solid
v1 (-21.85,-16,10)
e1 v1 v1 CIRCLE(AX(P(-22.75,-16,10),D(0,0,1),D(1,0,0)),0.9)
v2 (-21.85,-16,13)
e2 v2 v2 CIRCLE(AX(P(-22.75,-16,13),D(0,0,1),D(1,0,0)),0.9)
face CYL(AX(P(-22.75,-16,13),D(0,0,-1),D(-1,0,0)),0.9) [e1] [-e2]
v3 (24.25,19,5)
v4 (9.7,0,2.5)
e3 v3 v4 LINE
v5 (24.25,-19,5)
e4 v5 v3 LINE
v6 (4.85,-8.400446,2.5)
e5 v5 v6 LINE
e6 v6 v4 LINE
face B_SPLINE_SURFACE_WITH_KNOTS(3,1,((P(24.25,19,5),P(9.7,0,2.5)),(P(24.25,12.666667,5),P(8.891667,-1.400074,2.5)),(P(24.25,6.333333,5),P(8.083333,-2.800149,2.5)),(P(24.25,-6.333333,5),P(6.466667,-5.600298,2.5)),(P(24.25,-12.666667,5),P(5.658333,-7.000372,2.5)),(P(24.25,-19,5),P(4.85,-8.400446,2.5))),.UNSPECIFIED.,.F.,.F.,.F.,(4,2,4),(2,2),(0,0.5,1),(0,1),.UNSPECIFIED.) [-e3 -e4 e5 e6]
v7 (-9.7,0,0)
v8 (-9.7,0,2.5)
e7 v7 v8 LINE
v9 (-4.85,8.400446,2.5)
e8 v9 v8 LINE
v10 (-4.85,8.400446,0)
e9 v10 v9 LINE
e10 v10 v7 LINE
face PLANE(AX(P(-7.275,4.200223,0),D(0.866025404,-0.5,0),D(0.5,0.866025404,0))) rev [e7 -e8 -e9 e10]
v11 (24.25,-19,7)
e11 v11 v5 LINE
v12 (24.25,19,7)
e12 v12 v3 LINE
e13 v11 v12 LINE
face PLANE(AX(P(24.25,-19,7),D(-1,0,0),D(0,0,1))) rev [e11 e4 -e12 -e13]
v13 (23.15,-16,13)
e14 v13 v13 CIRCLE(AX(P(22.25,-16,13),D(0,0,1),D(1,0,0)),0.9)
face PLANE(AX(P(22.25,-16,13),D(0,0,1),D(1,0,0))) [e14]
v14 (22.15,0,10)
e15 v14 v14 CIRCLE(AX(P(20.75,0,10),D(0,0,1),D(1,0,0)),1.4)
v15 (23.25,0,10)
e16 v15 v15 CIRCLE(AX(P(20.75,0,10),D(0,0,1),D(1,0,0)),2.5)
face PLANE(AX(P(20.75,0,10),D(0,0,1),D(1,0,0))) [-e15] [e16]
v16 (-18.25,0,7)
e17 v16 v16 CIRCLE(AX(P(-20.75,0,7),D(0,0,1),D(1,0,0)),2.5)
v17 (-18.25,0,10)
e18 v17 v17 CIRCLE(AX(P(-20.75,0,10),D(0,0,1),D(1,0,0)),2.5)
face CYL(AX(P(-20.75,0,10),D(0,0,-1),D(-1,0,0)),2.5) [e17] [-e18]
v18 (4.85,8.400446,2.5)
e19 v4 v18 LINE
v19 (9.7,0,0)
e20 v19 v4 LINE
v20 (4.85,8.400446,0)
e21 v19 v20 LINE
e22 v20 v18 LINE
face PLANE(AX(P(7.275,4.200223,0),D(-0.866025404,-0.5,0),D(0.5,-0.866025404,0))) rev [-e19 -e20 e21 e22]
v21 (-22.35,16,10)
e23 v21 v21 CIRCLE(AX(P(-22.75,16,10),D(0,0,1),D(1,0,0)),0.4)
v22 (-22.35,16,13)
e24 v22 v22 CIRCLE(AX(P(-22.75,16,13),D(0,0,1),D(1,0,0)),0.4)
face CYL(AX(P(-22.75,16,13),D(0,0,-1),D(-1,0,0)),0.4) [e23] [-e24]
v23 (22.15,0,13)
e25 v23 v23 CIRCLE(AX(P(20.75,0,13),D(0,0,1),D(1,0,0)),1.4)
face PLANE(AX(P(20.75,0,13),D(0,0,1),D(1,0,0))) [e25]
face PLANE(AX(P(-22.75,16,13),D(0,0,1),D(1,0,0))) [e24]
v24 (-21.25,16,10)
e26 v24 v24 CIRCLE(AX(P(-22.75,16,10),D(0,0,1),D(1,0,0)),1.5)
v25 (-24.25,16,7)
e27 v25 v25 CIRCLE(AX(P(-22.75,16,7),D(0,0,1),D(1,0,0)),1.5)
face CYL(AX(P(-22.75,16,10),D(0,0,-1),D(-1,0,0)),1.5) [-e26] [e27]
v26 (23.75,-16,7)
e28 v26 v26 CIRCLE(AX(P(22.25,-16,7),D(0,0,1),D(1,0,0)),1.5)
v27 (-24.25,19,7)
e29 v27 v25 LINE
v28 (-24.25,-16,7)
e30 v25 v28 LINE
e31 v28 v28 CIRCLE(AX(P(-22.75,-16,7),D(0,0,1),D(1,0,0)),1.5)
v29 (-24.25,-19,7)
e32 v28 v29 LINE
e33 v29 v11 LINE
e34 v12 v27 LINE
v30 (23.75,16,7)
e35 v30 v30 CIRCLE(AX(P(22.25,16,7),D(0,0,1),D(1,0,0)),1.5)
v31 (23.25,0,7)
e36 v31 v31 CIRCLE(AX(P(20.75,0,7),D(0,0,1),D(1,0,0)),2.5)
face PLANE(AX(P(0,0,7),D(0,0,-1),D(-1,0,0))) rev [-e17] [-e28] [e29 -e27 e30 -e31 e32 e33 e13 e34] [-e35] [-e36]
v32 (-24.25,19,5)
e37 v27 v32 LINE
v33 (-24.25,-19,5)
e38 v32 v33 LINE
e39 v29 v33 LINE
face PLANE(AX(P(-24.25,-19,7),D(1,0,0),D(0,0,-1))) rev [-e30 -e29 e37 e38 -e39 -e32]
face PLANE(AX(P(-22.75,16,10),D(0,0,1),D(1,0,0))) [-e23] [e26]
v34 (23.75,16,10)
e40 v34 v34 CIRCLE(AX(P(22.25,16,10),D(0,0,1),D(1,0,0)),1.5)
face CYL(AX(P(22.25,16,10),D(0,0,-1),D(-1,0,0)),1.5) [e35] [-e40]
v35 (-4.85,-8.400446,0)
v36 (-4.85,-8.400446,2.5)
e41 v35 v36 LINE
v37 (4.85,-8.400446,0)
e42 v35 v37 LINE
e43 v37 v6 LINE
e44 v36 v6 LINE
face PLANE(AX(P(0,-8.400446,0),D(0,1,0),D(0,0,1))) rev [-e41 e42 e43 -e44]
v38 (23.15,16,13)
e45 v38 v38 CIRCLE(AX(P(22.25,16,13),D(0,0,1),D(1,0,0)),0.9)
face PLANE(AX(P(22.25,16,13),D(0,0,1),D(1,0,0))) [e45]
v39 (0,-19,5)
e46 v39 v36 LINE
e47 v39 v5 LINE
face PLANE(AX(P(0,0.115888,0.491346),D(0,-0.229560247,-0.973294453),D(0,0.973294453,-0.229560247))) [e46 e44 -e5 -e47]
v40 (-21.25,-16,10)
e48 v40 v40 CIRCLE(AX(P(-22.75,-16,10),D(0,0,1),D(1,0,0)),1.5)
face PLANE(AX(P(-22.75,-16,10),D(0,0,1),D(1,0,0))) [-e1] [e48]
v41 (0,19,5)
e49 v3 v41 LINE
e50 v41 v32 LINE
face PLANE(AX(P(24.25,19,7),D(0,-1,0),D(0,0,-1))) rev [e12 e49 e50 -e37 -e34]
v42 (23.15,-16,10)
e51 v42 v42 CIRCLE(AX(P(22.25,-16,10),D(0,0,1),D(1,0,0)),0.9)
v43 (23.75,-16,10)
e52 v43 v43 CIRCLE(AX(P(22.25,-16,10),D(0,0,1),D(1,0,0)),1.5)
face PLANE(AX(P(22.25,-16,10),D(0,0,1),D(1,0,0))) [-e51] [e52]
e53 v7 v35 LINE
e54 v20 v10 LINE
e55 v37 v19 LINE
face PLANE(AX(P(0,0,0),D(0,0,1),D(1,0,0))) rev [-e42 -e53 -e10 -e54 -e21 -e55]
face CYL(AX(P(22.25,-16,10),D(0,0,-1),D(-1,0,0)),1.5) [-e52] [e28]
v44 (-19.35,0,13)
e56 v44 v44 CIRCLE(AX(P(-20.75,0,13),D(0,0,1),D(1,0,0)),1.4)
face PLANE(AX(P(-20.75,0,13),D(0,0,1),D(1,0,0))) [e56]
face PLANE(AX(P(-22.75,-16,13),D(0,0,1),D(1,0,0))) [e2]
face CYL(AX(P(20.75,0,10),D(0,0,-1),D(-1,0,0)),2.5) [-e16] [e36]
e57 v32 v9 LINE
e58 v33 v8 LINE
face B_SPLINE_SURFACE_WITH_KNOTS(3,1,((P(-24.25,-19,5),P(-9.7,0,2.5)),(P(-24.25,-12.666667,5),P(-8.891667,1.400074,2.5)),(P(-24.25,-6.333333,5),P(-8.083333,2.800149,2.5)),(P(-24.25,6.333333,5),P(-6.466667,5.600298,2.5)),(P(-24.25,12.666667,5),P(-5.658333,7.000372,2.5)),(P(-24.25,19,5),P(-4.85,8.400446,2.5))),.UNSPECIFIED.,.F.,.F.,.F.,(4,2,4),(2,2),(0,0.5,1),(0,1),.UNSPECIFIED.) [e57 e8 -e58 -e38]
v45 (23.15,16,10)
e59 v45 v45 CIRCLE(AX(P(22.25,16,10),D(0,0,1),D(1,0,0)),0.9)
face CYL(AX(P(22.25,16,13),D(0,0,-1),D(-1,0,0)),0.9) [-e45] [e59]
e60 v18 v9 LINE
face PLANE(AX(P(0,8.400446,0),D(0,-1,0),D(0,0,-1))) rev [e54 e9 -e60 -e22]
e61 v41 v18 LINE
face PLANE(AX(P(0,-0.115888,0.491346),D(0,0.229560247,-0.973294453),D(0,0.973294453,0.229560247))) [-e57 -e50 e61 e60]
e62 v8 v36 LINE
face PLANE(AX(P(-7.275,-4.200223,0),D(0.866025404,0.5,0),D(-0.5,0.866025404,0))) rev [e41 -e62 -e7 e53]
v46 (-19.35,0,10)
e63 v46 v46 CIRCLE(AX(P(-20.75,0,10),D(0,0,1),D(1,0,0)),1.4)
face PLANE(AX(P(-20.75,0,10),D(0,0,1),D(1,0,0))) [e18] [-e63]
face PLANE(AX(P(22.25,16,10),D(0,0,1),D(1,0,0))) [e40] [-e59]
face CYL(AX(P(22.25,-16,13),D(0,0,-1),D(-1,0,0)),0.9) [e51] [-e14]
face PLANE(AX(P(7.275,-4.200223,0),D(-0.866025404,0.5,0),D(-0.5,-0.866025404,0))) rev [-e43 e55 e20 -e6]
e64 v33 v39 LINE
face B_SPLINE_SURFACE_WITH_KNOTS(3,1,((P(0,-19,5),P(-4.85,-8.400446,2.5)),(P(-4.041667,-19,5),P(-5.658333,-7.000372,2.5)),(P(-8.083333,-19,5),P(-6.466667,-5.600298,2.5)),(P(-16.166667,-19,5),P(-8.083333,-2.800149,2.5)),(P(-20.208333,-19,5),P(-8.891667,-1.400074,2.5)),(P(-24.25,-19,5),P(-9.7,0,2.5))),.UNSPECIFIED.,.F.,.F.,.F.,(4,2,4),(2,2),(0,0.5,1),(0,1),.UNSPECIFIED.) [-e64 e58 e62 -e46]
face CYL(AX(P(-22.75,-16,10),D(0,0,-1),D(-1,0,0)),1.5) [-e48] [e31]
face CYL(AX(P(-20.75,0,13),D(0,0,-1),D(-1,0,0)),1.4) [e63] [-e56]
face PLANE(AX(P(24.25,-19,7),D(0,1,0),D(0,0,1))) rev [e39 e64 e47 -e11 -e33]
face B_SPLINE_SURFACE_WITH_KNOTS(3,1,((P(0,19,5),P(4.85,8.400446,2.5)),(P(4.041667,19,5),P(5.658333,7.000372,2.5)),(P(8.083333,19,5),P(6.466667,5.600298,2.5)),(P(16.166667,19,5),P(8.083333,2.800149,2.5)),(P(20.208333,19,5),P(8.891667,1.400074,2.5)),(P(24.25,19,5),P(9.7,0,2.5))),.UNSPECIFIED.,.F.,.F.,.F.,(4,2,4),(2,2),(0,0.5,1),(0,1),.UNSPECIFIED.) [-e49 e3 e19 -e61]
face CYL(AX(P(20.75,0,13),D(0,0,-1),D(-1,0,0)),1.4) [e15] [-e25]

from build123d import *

# Parameters (mm, degrees)
SKIZZE2_2_W                     = 38
SKIZZE2_2_H                     = 48.5
AUFSATZ_LINEAR_AUSTRAGEN1_DEPTH = 2
SKIZZE4_R                       = 2.5
SKIZZE4_R_2                     = 1.5
AUFSATZ_LINEAR_AUSTRAGEN2_DEPTH = 3
SKIZZE5_R                       = 0.4
SKIZZE5_R_2                     = 0.9
SKIZZE5_R_3                     = 1.4
AUFSATZ_LINEAR_AUSTRAGEN3_DEPTH = 3


with BuildPart() as part:
    # Skizze1 → Ausformung3 section 0
    with BuildSketch(Plane(origin=(0, 0, 0), x_dir=(0, 1, 0), z_dir=(0, 0, 1))):
        with BuildLine():
            Line((0, 9.7), (-8.400446417, 4.85))
            Line((-8.400446417, 4.85), (-8.400446417, -4.85))
            Line((-8.400446417, -4.85), (0, -9.7))
            Line((0, -9.7), (8.400446417, -4.85))
            Line((8.400446417, -4.85), (8.400446417, 4.85))
            Line((8.400446417, 4.85), (0, 9.7))
        make_face()
    # Skizze3 → Ausformung3 section 1
    with BuildSketch(Plane(origin=(0, 0, 2.5), x_dir=(0, 1, 0), z_dir=(0, 0, 1))):
        with BuildLine():
            Line((8.400446417, 4.85), (0, 9.7))
            Line((0, 9.7), (-8.400446417, 4.85))
            Line((-8.400446417, 4.85), (-8.400446417, -4.85))
            Line((-8.400446417, -4.85), (0, -9.7))
            Line((0, -9.7), (8.400446417, -4.85))
            Line((8.400446417, -4.85), (8.400446417, 4.85))
        make_face()
    loft()

    # Ausformung4: read off the stored shape, not the designer's step
    # Ausformung4: loft between two sections, ruled curve by curve
    ausformung4_from = [
        Edge.make_bspline([(24.25, 19, 5), (24.25, 12.666666667, 5), (24.25, 6.333333333, 5), (24.25, -6.333333333, 5), (24.25, -12.666666667, 5), (24.25, -19, 5)], [0, 0, 0, 0, 0.5, 0.5, 1, 1, 1, 1], 3),
        Edge.make_bspline([(0, -19, 5), (-4.041666667, -19, 5), (-8.083333333, -19, 5), (-16.166666667, -19, 5), (-20.208333333, -19, 5), (-24.25, -19, 5)], [0, 0, 0, 0, 0.5, 0.5, 1, 1, 1, 1], 3),
        Edge.make_bspline([(-24.25, -19, 5), (-24.25, -12.666666667, 5), (-24.25, -6.333333333, 5), (-24.25, 6.333333333, 5), (-24.25, 12.666666667, 5), (-24.25, 19, 5)], [0, 0, 0, 0, 0.5, 0.5, 1, 1, 1, 1], 3),
        Edge.make_bspline([(0, 19, 5), (4.041666667, 19, 5), (8.083333333, 19, 5), (16.166666667, 19, 5), (20.208333333, 19, 5), (24.25, 19, 5)], [0, 0, 0, 0, 0.5, 0.5, 1, 1, 1, 1], 3),
        Edge.make_line((0, -19, 5), (24.25, -19, 5)),
        Edge.make_line((0, 19, 5), (-24.25, 19, 5)),
    ]
    ausformung4_to = [
        Edge.make_bspline([(9.7, 0, 2.5), (8.891666667, -1.400074403, 2.5), (8.083333333, -2.800148806, 2.5), (6.466666667, -5.600297611, 2.5), (5.658333333, -7.000372014, 2.5), (4.85, -8.400446417, 2.5)], [0, 0, 0, 0, 0.5, 0.5, 1, 1, 1, 1], 3),
        Edge.make_bspline([(-4.85, -8.400446417, 2.5), (-5.658333333, -7.000372014, 2.5), (-6.466666667, -5.600297611, 2.5), (-8.083333333, -2.800148806, 2.5), (-8.891666667, -1.400074403, 2.5), (-9.7, 0, 2.5)], [0, 0, 0, 0, 0.5, 0.5, 1, 1, 1, 1], 3),
        Edge.make_bspline([(-9.7, 0, 2.5), (-8.891666667, 1.400074403, 2.5), (-8.083333333, 2.800148806, 2.5), (-6.466666667, 5.600297611, 2.5), (-5.658333333, 7.000372014, 2.5), (-4.85, 8.400446417, 2.5)], [0, 0, 0, 0, 0.5, 0.5, 1, 1, 1, 1], 3),
        Edge.make_bspline([(4.85, 8.400446417, 2.5), (5.658333333, 7.000372014, 2.5), (6.466666667, 5.600297611, 2.5), (8.083333333, 2.800148806, 2.5), (8.891666667, 1.400074403, 2.5), (9.7, 0, 2.5)], [0, 0, 0, 0, 0.5, 0.5, 1, 1, 1, 1], 3),
        Edge.make_line((-4.85, -8.400446417, 2.5), (4.85, -8.400446417, 2.5)),
        Edge.make_line((4.85, 8.400446417, 2.5), (-4.85, 8.400446417, 2.5)),
    ]
    ausformung4 = Solid(Shell([*[Face.make_surface_from_curves(ausformung4_from[k], ausformung4_to[k]) for k in range(6)], Face(Wire(ausformung4_from)), Face(Wire(ausformung4_to))]))
    add(ausformung4)

    # Skizze2<2> → Aufsatz-Linear austragen1 (add)
    with BuildSketch(Plane(origin=(0, 0, 5), x_dir=(0, 1, 0), z_dir=(0, 0, 1))):
        Rectangle(SKIZZE2_2_W, SKIZZE2_2_H)
    extrude(amount=AUFSATZ_LINEAR_AUSTRAGEN1_DEPTH)

    # Skizze4 → Aufsatz-Linear austragen2 (add)
    with BuildSketch(Plane.XY.offset(7)):
        with Locations((-20.75, 0)):
            Circle(SKIZZE4_R)
        with Locations((20.75, 0)):
            Circle(SKIZZE4_R)
        with Locations(Location((-22.75, 16, 0), (0, 0, 180))):
            Circle(SKIZZE4_R_2)
        with Locations(Location((-22.75, -16, 0), (0, 0, 180))):
            Circle(SKIZZE4_R_2)
        with Locations((22.25, 16)):
            Circle(SKIZZE4_R_2)
        with Locations((22.25, -16)):
            Circle(SKIZZE4_R_2)
    extrude(amount=AUFSATZ_LINEAR_AUSTRAGEN2_DEPTH)

    # Skizze5 → Aufsatz-Linear austragen3 (add)
    with BuildSketch(Plane.XY.offset(10)):
        with Locations((-22.75, 16)):
            Circle(SKIZZE5_R)
        with Locations((-22.75, -16)):
            Circle(SKIZZE5_R_2)
        with Locations((-20.75, 0)):
            Circle(SKIZZE5_R_3)
        with Locations((20.75, 0)):
            Circle(SKIZZE5_R_3)
        with Locations((22.25, 16)):
            Circle(SKIZZE5_R_2)
        with Locations((22.25, -16)):
            Circle(SKIZZE5_R_2)
    extrude(amount=AUFSATZ_LINEAR_AUSTRAGEN3_DEPTH)


solid = part.part
